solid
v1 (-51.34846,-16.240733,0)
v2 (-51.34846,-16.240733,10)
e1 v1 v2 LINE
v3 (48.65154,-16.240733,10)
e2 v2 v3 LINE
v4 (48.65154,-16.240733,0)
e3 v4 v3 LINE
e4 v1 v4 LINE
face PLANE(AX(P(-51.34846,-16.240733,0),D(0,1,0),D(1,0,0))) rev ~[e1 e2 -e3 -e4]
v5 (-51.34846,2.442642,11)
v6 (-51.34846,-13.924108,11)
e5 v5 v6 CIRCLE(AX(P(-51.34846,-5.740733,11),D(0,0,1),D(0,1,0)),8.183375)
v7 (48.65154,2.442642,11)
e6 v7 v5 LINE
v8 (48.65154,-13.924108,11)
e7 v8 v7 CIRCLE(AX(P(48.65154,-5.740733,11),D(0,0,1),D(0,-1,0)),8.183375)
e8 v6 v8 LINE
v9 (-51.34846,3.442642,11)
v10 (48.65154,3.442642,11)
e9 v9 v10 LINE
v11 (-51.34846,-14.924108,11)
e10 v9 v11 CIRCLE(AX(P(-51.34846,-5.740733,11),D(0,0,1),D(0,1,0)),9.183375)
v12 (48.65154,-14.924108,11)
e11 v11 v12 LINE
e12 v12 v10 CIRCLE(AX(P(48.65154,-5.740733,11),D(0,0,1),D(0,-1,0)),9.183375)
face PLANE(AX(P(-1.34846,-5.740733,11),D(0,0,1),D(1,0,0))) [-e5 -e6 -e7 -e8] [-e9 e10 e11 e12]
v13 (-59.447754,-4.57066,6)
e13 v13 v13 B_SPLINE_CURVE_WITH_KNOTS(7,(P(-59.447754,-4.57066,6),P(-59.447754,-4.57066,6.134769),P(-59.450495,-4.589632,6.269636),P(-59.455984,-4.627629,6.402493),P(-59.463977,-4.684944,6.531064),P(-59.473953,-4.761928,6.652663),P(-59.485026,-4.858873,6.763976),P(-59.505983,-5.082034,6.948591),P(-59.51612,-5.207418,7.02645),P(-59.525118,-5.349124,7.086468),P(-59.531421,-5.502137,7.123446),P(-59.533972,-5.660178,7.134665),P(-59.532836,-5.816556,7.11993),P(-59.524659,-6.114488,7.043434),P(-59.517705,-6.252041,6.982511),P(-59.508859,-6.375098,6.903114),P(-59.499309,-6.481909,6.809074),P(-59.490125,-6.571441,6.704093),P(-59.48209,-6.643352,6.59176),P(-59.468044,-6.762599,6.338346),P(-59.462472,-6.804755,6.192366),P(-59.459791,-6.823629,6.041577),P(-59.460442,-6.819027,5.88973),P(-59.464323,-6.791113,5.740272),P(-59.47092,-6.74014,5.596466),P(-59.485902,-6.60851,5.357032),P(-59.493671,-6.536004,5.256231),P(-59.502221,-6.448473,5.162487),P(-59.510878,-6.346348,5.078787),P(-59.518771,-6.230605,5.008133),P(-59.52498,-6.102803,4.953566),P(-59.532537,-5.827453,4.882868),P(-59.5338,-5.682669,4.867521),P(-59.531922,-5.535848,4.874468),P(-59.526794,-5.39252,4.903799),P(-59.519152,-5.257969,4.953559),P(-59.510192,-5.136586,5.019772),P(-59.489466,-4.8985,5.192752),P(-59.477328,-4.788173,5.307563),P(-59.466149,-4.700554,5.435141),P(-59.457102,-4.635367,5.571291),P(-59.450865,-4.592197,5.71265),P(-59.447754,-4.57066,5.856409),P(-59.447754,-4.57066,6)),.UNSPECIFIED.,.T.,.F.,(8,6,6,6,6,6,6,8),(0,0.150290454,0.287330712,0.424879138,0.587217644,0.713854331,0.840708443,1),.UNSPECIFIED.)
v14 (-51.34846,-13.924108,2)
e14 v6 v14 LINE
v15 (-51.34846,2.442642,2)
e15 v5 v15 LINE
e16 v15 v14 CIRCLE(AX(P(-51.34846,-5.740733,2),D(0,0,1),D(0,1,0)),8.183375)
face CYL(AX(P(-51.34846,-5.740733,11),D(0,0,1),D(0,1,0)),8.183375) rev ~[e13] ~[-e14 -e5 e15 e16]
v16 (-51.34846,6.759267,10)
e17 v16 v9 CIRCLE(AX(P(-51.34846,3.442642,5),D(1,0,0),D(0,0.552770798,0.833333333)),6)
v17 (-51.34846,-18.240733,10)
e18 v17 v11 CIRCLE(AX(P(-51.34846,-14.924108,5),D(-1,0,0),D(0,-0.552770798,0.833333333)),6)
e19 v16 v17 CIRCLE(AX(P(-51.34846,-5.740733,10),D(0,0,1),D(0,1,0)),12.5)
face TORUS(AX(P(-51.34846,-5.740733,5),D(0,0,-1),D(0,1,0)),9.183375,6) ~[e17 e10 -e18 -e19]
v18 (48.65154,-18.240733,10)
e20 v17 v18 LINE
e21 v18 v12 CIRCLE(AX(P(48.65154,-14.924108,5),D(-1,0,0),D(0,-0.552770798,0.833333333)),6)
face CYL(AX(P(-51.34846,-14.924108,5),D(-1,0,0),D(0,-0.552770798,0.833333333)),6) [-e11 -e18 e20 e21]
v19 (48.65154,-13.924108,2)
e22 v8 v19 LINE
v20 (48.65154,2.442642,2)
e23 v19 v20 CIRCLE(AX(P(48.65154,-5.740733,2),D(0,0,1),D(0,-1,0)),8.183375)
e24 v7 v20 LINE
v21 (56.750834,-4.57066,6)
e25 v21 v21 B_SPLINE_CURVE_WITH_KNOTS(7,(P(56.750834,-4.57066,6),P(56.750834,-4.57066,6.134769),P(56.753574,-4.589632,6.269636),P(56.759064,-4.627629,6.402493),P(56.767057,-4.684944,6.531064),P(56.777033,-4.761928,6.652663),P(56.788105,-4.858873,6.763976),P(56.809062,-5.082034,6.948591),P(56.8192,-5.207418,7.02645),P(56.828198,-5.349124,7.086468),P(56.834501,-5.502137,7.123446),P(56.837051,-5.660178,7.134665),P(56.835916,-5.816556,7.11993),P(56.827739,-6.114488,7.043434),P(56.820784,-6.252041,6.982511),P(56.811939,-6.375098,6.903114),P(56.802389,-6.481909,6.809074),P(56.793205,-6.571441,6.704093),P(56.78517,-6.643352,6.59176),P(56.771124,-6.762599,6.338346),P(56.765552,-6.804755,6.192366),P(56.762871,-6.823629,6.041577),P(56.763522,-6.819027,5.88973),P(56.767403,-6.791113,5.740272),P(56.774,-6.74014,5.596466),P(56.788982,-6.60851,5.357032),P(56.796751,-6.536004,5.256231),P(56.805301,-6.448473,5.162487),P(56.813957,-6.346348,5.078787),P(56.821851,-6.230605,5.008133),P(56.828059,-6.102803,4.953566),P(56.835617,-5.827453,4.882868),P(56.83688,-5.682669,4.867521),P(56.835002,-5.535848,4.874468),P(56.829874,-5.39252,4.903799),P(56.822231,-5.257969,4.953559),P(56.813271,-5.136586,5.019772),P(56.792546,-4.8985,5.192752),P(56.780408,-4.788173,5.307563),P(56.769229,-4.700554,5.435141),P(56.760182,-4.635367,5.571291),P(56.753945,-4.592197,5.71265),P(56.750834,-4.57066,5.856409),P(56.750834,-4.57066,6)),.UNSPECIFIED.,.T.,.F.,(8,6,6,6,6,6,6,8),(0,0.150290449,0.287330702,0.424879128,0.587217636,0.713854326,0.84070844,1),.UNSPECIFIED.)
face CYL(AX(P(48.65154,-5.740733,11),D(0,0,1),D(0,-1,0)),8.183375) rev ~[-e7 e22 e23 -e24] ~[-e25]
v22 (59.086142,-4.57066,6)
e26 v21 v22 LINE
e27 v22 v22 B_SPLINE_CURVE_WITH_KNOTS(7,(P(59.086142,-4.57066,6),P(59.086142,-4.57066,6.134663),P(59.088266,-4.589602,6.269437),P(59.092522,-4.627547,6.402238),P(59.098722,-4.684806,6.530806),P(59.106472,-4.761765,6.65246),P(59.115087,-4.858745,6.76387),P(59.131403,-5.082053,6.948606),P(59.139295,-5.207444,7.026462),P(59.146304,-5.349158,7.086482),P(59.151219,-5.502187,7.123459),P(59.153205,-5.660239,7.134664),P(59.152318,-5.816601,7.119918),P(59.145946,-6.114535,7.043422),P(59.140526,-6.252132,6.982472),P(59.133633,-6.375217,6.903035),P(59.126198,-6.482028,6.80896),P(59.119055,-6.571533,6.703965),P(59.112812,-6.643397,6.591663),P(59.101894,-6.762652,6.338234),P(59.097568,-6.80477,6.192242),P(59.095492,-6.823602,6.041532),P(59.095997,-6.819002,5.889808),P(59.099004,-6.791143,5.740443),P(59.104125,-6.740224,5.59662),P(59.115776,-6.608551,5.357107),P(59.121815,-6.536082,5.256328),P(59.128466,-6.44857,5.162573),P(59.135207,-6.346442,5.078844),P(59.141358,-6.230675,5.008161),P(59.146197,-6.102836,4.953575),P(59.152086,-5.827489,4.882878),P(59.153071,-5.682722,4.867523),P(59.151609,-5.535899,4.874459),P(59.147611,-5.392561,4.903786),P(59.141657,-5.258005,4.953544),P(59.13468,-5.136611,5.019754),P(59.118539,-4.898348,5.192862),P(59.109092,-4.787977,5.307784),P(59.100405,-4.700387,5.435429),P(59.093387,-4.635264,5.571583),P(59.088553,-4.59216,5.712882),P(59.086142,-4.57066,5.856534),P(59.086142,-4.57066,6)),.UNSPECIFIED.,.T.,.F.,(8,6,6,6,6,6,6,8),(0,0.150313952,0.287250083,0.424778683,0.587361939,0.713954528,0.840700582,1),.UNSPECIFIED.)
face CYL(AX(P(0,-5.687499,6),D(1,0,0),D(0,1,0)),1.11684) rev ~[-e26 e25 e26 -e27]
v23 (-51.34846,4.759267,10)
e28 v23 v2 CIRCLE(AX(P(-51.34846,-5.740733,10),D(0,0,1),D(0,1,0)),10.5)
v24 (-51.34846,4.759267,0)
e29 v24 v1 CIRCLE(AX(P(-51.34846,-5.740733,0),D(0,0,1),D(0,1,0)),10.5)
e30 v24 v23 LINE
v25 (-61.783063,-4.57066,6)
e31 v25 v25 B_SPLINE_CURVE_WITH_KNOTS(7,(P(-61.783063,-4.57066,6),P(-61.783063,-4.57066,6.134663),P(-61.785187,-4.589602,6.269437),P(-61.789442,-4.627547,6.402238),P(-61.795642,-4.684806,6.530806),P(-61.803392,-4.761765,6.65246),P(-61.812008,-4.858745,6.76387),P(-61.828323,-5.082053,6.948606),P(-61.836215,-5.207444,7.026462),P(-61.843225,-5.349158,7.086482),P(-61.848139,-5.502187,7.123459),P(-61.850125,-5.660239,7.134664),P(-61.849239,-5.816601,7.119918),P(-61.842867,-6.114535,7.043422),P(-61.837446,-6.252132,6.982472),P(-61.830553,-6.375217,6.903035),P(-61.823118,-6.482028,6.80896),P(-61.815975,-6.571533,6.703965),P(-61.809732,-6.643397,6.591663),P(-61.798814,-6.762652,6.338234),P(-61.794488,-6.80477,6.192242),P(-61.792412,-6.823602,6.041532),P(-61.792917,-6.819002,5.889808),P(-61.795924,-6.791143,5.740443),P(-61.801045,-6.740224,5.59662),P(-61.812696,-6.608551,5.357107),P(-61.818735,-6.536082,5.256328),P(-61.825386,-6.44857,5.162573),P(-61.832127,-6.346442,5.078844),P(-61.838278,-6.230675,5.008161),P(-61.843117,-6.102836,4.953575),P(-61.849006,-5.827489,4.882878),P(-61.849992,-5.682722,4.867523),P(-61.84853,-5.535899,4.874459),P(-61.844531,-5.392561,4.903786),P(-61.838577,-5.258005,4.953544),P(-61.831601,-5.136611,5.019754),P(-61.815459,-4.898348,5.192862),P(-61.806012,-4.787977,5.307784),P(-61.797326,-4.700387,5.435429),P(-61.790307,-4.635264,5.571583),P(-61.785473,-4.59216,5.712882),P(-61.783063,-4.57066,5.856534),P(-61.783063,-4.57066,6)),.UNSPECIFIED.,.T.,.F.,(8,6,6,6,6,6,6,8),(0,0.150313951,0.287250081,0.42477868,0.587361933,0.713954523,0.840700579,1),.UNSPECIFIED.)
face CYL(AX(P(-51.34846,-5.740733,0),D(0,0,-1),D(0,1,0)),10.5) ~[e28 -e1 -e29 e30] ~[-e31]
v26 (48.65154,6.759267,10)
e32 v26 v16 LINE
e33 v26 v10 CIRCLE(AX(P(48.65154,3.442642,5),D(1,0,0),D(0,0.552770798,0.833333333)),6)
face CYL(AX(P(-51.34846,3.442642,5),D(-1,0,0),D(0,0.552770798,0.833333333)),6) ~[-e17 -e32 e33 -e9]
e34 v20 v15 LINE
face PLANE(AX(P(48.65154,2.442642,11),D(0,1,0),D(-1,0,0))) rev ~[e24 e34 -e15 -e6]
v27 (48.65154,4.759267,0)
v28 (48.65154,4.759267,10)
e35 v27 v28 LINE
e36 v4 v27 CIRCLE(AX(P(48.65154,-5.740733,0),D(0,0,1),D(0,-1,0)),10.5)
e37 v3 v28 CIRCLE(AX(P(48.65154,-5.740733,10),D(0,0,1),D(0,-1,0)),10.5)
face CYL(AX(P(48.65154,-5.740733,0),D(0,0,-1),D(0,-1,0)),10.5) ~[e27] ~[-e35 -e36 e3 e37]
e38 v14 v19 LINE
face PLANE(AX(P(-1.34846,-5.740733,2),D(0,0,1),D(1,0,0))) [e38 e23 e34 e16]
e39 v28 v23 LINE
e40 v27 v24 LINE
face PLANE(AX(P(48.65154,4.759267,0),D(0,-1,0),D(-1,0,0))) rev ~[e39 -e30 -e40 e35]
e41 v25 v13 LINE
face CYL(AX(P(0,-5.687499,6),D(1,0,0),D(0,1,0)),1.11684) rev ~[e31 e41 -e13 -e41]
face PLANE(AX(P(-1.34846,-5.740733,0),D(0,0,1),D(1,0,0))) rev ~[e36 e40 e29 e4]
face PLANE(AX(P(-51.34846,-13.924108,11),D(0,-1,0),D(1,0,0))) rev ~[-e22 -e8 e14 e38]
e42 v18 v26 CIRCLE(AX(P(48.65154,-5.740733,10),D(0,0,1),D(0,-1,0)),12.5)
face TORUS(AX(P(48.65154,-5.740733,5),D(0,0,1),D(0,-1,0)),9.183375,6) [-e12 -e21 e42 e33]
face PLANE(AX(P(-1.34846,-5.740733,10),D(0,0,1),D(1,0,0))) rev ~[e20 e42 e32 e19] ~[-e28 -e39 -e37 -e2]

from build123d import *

# Parameters (mm, degrees)
F1_DEPTH    = 10
F3_DEPTH    = 1
F4_T1_DEPTH = 100
F4_T4_ANGLE = 180
F4_T6_ANGLE = 180
F6_DEPTH    = 9
F7_R        = 1.1168399156
F8_DEPTH    = 100


# Not quite as in the source:
# - a fillet or chamfer that OpenCascade refuses, or shapes differently, is made with other operations: its cross-section is extruded or revolved along the edge and cut away or added


with BuildPart() as f1:
    # F0 (on Top) → F1 (new body)
    with BuildSketch(Plane.XY):
        with BuildLine():
            Line((48.6515399069, 4.7592671573), (-51.3484600931, 4.7592671573))
            ThreePointArc((-51.3484600931, 4.7592671573), (-61.8484600931, -5.7407328427), (-51.3484600931, -16.2407328427))
            Line((-51.3484600931, -16.2407328427), (48.6515399069, -16.2407328427))
            ThreePointArc((48.6515399069, -16.2407328427), (59.1515399069, -5.7407328427), (48.6515399069, 4.7592671573))
        make_face()
    extrude(amount=F1_DEPTH)

    # F2 (on face) → F3 (join)
    with BuildSketch(Plane.XY.offset(10)):
        with BuildLine():
            Line((48.6515399069, 6.7592671573), (-51.3484600931, 6.7592671573))
            ThreePointArc((-51.3484600931, 6.7592671573), (-63.8484600931, -5.7407328427), (-51.3484600931, -18.2407328427))
            Line((-51.3484600931, -18.2407328427), (48.6515399069, -18.2407328427))
            ThreePointArc((48.6515399069, -18.2407328427), (61.1515399069, -5.7407328427), (48.6515399069, 6.7592671573))
        make_face()
        with BuildLine():
            Line((-51.3484600931, 4.7592671573), (48.6515399069, 4.7592671573))
            ThreePointArc((48.6515399069, 4.7592671573), (59.1515399069, -5.7407328427), (48.6515399069, -16.2407328427))
            Line((48.6515399069, -16.2407328427), (-51.3484600931, -16.2407328427))
            ThreePointArc((-51.3484600931, -16.2407328427), (-61.8484600931, -5.7407328427), (-51.3484600931, 4.7592671573))
        make_face(mode=Mode.SUBTRACT)
        with BuildLine():
            ThreePointArc((48.6515399069, -16.2407328427), (59.1515399069, -5.7407328427), (48.6515399069, 4.7592671573))
            Line((48.6515399069, 4.7592671573), (-51.3484600931, 4.7592671573))
            ThreePointArc((-51.3484600931, 4.7592671573), (-61.8484600931, -5.7407328427), (-51.3484600931, -16.2407328427))
            Line((-51.3484600931, -16.2407328427), (48.6515399069, -16.2407328427))
        make_face()
    extrude(amount=F3_DEPTH)

    # F4: fillet of radius 6 on 4 edges, made by hand

    # F4_s2 → F4_t1 (cut)
    with BuildSketch(Plane.YZ.offset(-51.3484600931)):
        with BuildLine():
            ThreePointArc((6.7592671573, 10), (5.1746931745, 10.7445626465), (3.4426423669, 11))
            Line((3.4426423669, 11), (6.7592671573, 11))
            Line((6.7592671573, 11), (6.7592671573, 10))
        make_face()
        with BuildLine():
            ThreePointArc((-18.2407328427, 10), (-16.6561588599, 10.7445626465), (-14.9241080524, 11))
            Line((-14.9241080524, 11), (-18.2407328427, 11))
            Line((-18.2407328427, 11), (-18.2407328427, 10))
        make_face()
    extrude(amount=F4_T1_DEPTH, mode=Mode.SUBTRACT)

    # F4_s3 → F4_t4 (revolve, cut)
    with BuildSketch(Plane.YZ.offset(48.6515399069)):
        with BuildLine():
            ThreePointArc((-18.2407328427, 10), (-16.6561588599, 10.7445626465), (-14.9241080524, 11))
            Line((-14.9241080524, 11), (-18.2407328427, 11))
            Line((-18.2407328427, 11), (-18.2407328427, 10))
        make_face()
    revolve(axis=Axis((48.6515399069, -5.7407328427, 11), (0, 0, 1)), revolution_arc=F4_T4_ANGLE, mode=Mode.SUBTRACT)

    # F4_s5 → F4_t6 (revolve, cut)
    with BuildSketch(Plane.YZ.offset(-51.3484600931)):
        with BuildLine():
            ThreePointArc((3.4426423669, 11), (5.1746931745, 10.7445626465), (6.7592671573, 10))
            Line((6.7592671573, 10), (6.7592671573, 11))
            Line((6.7592671573, 11), (3.4426423669, 11))
        make_face()
    revolve(axis=Axis((-51.3484600931, -5.7407328427, 11), (0, 0, 1)), revolution_arc=F4_T6_ANGLE, mode=Mode.SUBTRACT)

    # F5 (on face) → F6 (cut)
    with BuildSketch(Plane.XY.offset(11)):
        with BuildLine():
            Line((48.6515399069, 2.4426423669), (-51.3484600931, 2.4426423669))
            ThreePointArc((-51.3484600931, 2.4426423669), (-59.5318353028, -5.7407328427), (-51.3484600931, -13.9241080524))
            Line((-51.3484600931, -13.9241080524), (48.6515399069, -13.9241080524))
            ThreePointArc((48.6515399069, -13.9241080524), (56.8349151165, -5.7407328427), (48.6515399069, 2.4426423669))
        make_face()
    extrude(amount=-F6_DEPTH, mode=Mode.SUBTRACT)

    # F7 (on Right) → F8 (cut, symmetric)
    with BuildSketch(Plane.YZ):
        with Locations((-5.6874994189, 6)):
            Circle(F7_R)
    extrude(amount=F8_DEPTH, both=True, mode=Mode.SUBTRACT)


solid = f1.part
